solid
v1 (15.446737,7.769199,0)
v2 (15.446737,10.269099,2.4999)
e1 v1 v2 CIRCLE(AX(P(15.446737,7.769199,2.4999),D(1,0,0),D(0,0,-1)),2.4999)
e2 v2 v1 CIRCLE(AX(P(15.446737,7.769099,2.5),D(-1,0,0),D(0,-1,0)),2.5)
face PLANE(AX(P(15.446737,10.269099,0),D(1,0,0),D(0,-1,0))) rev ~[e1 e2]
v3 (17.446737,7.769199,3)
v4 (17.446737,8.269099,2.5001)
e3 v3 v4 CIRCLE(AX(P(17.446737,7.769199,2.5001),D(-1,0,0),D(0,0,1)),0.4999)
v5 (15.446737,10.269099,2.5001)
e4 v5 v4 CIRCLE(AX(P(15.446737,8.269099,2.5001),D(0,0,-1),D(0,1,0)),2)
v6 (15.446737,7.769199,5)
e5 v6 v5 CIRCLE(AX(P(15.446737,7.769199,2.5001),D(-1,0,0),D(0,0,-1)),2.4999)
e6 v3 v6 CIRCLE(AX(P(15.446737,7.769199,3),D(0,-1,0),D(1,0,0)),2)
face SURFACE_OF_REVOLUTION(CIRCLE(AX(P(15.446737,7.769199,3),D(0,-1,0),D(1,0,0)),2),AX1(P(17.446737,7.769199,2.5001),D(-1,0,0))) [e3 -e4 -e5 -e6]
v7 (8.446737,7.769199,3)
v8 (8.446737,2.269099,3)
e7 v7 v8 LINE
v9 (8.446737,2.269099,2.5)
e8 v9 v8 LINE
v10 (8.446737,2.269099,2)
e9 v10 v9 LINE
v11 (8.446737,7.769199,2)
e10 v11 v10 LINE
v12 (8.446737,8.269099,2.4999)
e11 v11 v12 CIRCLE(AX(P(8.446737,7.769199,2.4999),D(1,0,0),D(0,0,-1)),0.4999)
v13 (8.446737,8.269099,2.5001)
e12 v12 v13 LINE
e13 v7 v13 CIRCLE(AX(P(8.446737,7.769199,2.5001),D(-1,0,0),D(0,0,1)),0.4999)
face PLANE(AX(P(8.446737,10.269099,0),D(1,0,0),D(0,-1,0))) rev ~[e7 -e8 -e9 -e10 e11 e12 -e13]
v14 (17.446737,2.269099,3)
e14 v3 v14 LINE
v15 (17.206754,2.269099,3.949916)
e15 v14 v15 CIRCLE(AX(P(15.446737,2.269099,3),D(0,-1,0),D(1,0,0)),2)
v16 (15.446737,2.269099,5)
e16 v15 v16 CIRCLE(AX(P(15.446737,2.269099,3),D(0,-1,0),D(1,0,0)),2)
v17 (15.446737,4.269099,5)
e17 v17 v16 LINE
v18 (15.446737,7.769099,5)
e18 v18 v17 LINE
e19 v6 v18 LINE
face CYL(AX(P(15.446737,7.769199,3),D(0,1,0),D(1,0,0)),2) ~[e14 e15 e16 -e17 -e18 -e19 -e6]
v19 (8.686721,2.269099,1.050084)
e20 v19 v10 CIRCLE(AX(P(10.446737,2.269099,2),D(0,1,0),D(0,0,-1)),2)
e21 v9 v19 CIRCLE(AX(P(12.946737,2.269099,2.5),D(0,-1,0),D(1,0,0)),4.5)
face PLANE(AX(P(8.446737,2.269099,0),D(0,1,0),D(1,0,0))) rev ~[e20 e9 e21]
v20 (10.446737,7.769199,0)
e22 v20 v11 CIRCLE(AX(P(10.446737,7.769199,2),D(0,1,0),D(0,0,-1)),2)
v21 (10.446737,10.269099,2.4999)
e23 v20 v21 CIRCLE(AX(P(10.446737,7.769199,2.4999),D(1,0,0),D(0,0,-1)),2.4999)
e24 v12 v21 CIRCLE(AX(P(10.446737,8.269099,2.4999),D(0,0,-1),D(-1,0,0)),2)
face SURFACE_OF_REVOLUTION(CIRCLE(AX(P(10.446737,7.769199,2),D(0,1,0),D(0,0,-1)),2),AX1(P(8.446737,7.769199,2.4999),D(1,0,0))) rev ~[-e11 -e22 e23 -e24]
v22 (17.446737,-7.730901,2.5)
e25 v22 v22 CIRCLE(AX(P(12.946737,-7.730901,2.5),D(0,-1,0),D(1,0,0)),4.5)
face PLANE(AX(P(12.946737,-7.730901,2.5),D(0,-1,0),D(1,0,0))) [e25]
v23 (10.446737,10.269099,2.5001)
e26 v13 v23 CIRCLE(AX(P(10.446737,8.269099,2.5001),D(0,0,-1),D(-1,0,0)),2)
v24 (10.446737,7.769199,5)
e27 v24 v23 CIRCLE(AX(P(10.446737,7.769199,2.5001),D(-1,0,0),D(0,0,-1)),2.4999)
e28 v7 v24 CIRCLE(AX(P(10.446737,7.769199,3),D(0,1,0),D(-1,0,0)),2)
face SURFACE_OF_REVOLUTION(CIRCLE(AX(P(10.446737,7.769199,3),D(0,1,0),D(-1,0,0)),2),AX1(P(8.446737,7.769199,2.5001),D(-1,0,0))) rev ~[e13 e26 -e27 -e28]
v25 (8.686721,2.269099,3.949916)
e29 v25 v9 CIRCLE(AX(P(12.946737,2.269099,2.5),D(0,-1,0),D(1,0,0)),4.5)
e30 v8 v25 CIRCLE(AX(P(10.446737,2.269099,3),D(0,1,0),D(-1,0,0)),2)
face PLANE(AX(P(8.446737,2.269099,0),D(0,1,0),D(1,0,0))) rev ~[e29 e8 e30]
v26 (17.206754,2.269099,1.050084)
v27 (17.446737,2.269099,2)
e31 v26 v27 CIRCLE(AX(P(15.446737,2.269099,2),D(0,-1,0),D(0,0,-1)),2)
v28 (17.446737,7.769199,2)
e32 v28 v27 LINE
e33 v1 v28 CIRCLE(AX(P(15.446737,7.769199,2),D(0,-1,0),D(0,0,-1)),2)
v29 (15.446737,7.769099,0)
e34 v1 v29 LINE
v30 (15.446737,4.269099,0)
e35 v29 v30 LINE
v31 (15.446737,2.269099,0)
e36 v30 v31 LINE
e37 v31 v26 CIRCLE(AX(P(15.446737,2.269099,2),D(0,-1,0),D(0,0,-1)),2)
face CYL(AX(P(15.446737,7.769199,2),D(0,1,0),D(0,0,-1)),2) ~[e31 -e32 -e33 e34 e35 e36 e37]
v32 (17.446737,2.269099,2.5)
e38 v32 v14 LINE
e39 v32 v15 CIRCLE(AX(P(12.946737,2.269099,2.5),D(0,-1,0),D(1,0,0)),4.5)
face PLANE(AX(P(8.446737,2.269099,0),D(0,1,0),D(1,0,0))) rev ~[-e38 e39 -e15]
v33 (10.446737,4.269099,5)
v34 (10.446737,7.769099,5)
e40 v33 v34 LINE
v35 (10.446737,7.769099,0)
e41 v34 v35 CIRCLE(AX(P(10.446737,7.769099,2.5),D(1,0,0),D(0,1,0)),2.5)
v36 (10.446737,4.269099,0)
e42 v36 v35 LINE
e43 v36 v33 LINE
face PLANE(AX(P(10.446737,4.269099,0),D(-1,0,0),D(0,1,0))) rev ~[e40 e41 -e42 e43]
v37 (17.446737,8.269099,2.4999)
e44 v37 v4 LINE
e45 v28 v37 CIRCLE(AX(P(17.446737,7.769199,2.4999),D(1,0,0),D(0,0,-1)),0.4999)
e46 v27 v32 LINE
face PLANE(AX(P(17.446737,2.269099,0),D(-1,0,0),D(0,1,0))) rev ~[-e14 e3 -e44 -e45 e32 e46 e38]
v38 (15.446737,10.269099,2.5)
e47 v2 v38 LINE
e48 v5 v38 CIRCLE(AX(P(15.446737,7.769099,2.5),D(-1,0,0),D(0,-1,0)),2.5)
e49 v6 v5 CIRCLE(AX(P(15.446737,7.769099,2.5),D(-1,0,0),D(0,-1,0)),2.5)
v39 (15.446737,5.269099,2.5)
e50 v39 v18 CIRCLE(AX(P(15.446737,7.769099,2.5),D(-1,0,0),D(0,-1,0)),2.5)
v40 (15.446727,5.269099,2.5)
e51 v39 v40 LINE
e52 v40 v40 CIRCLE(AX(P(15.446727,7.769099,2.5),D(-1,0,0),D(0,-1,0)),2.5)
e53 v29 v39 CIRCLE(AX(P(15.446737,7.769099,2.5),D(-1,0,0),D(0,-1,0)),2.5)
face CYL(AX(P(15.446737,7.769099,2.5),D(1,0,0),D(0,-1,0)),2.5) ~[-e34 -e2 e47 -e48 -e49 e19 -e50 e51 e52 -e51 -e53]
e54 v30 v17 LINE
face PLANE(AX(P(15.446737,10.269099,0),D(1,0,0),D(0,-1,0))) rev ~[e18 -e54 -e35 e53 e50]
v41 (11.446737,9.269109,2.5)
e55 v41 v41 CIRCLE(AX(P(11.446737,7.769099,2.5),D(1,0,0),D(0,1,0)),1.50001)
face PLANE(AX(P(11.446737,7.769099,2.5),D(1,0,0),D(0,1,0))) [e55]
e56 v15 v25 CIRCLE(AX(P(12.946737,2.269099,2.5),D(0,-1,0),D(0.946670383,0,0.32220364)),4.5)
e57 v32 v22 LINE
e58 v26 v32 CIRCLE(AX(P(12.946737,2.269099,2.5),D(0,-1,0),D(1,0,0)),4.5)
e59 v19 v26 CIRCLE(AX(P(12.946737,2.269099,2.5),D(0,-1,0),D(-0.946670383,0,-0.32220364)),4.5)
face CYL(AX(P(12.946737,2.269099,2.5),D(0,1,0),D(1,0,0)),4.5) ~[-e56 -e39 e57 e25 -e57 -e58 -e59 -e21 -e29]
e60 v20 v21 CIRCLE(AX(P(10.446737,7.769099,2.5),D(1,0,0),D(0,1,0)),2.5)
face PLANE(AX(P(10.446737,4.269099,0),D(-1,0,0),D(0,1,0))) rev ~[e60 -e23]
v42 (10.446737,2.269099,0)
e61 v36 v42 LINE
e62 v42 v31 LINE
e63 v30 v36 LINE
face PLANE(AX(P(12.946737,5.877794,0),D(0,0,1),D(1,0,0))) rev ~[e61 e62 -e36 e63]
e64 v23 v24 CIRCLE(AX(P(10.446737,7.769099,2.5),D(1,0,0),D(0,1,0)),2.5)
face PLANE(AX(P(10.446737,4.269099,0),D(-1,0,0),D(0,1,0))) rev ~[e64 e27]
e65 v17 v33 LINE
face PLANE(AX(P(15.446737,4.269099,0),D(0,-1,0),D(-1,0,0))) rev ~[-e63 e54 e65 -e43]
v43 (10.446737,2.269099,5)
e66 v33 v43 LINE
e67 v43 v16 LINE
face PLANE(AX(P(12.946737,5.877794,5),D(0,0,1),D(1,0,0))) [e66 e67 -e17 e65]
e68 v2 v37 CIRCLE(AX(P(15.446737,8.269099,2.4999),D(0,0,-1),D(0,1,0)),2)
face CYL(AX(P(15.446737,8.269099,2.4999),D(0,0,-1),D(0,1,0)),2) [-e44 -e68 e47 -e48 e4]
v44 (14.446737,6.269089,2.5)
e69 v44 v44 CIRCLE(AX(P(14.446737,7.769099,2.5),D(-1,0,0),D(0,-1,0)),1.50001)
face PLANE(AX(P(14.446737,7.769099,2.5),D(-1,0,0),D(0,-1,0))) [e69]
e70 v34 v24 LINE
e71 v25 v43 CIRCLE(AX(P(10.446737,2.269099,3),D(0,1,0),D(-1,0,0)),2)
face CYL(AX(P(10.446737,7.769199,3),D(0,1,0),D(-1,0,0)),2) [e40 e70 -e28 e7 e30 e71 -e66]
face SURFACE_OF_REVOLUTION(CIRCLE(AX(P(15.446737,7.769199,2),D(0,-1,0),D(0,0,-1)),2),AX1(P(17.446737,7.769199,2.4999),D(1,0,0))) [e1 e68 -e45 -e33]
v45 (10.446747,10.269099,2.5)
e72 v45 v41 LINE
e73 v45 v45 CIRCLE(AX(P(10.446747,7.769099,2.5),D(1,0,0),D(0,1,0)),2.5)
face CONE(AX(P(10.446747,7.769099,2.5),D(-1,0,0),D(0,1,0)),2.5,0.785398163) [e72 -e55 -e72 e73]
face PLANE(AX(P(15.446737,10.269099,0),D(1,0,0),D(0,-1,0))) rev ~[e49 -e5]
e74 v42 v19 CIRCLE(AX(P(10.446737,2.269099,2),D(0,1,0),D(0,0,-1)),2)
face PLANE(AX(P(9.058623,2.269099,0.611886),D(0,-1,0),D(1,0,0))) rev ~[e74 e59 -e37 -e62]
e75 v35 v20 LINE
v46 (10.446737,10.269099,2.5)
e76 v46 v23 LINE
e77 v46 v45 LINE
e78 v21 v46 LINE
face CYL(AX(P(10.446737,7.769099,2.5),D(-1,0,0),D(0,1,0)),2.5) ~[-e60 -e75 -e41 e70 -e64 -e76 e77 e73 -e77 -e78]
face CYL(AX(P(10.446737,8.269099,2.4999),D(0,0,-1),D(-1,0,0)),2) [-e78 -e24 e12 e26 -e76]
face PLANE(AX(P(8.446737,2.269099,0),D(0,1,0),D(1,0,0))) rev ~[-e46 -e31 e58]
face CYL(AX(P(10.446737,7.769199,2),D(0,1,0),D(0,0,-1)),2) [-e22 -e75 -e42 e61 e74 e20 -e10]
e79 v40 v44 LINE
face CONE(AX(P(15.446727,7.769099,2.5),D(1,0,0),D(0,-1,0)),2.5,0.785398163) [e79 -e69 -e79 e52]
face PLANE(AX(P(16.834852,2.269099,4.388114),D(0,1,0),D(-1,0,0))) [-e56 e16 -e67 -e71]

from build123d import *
from build123d import SkipClean  # not in build123d's __all__

# Parameters (mm, degrees)
F1_DEPTH      = 5
F2_R          = 2.5
F3_DEPTH      = 1
F4_SIZE       = 0.99999
F5_R          = 2.5
F6_DEPTH      = 1
F7_SIZE       = 0.99999
F8_R          = 2.4999
F9_R          = 4.5
F10_DEPTH     = 10
F11_T1_DEPTH  = 5.5001
F11_T3_DEPTH  = 0.0002
F11_T6_ANGLE  = 90
F11_T8_ANGLE  = 90
F11_T10_ANGLE = 90
F11_T12_ANGLE = 90


# Not quite as in the source:
# - a fillet or chamfer that OpenCascade refuses, or shapes differently, is made with other operations: its cross-section is extruded or revolved along the edge and cut away or added
# - a fillet or chamfer is up to 0.001 mm smaller than in the source, because OpenCascade refuses the exact size


with BuildPart() as f1:
    # F0 (on Top) → F1 (new body)
    with BuildSketch(Plane.XY):
        Polygon((15.446737438, 4.2690986316), (10.446737438, 4.2690986316), (10.446737438, 10.2690986316), (8.446737438, 10.2690986316), (8.446737438, 2.2690986316), (17.446737438, 2.2690986316), (17.446737438, 10.2690986316), (15.446737438, 10.2690986316), align=None)
    extrude(amount=F1_DEPTH)

    # F2 (on face) → F3 (join)
    with BuildSketch(Plane.YZ.offset(10.446737438)):
        with Locations((7.7690986316, 2.5)):
            Circle(F2_R)
    extrude(amount=F3_DEPTH)

    # F4 (size 1 in the source; OpenCascade refuses exactly that, so slightly less here)
    f4_edges = [f1.edges().sort_by_distance(p)[0] for p in [
        (11.446737, 5.269099, 2.5),
    ]]
    chamfer(f4_edges, length=F4_SIZE)

    # F5 (on face) → F6 (join)
    with BuildSketch(Plane(origin=(15.446737438, 0, 0), x_dir=(0, -1, 0), z_dir=(-1, 0, 0))):
        with Locations((-7.7690986316, 2.5)):
            Circle(F5_R)
    extrude(amount=F6_DEPTH)

    # F7 (size 1 in the source; OpenCascade refuses exactly that, so slightly less here)
    f7_edges = [f1.edges().sort_by_distance(p)[0] for p in [
        (14.446737, 10.269099, 2.5),
    ]]
    chamfer(f7_edges, length=F7_SIZE)

    # F8 (radius 2.5 in the source; OpenCascade refuses exactly that, so slightly less here)
    f8_edges = [f1.edges().sort_by_distance(p)[0] for p in [
        (16.446737, 10.269099, 5),
        (16.446737, 10.269099, 0),
        (9.446737, 10.269099, 5),
        (9.446737, 10.269099, 0),
    ]]
    fillet(f8_edges, radius=F8_R)

    # F9 (on face) → F10 (join)
    with BuildSketch(Plane.XZ.offset(-2.2690986316)):
        with Locations((12.946737438, 2.5)):
            Circle(F9_R)
    extrude(amount=F10_DEPTH)

    # F11: fillet of radius 2 on 4 edges, made by hand

    # F11_s2 → F11_t1 (cut)
    with BuildSketch(Plane.XZ.offset(-7.7691986316)):
        with BuildLine():
            ThreePointArc((8.446737438, 3), (9.0325238756, 4.4142135624), (10.446737438, 5))
            Line((10.446737438, 5), (8.446737438, 5))
            Line((8.446737438, 5), (8.446737438, 3))
        make_face()
        with BuildLine():
            ThreePointArc((10.446737438, 0), (9.0325238756, 0.5857864376), (8.446737438, 2))
            Line((8.446737438, 2), (8.446737438, 0))
            Line((8.446737438, 0), (10.446737438, 0))
        make_face()
        with BuildLine():
            ThreePointArc((15.446737438, 0), (16.8609510003, 0.5857864376), (17.446737438, 2))
            Line((17.446737438, 2), (17.446737438, 0))
            Line((17.446737438, 0), (15.446737438, 0))
        make_face()
        with BuildLine():
            ThreePointArc((17.446737438, 3), (16.8609510003, 4.4142135624), (15.446737438, 5))
            Line((15.446737438, 5), (17.446737438, 5))
            Line((17.446737438, 5), (17.446737438, 3))
        make_face()
    extrude(amount=F11_T1_DEPTH, mode=Mode.SUBTRACT)

    # F11_s4 → F11_t3 (cut)
    with BuildSketch(Plane.XY.offset(2.4999)):
        with BuildLine():
            ThreePointArc((15.446737438, 10.2690986316), (16.8609510003, 9.6833121939), (17.446737438, 8.2690986316))
            Line((17.446737438, 8.2690986316), (17.446737438, 10.2690986316))
            Line((17.446737438, 10.2690986316), (15.446737438, 10.2690986316))
        make_face()
        with BuildLine():
            ThreePointArc((8.446737438, 8.2690986316), (9.0325238756, 9.6833121939), (10.446737438, 10.2690986316))
            Line((10.446737438, 10.2690986316), (8.446737438, 10.2690986316))
            Line((8.446737438, 10.2690986316), (8.446737438, 8.2690986316))
        make_face()
    with SkipClean():  # cleaning this boolean's faces spoils the solid; the shape is the same uncleaned
        extrude(amount=F11_T3_DEPTH, mode=Mode.SUBTRACT)

    # F11_s5 → F11_t6 (revolve, cut)
    with BuildSketch(Plane.XZ.offset(-7.7691986316)):
        with BuildLine():
            ThreePointArc((17.446737438, 3), (16.8609510003, 4.4142135624), (15.446737438, 5))
            Line((15.446737438, 5), (17.446737438, 5))
            Line((17.446737438, 5), (17.446737438, 3))
        make_face()
    with SkipClean():  # cleaning this boolean's faces spoils the solid; the shape is the same uncleaned
        revolve(axis=Axis((17.446737438, 7.7691986316, 2.5001), (-1, 0, 0)), revolution_arc=F11_T6_ANGLE, mode=Mode.SUBTRACT)

    # F11_s7 → F11_t8 (revolve, cut)
    with BuildSketch(Plane.XZ.offset(-7.7691986316)):
        with BuildLine():
            ThreePointArc((15.446737438, 0), (16.8609510003, 0.5857864376), (17.446737438, 2))
            Line((17.446737438, 2), (17.446737438, 0))
            Line((17.446737438, 0), (15.446737438, 0))
        make_face()
    with SkipClean():  # cleaning this boolean's faces spoils the solid; the shape is the same uncleaned
        revolve(axis=Axis((17.446737438, 7.7691986316, 2.4999), (1, 0, 0)), revolution_arc=F11_T8_ANGLE, mode=Mode.SUBTRACT)

    # F11_s9 → F11_t10 (revolve, cut)
    with BuildSketch(Plane.XZ.offset(-7.7691986316)):
        with BuildLine():
            ThreePointArc((10.446737438, 0), (9.0325238756, 0.5857864376), (8.446737438, 2))
            Line((8.446737438, 2), (8.446737438, 0))
            Line((8.446737438, 0), (10.446737438, 0))
        make_face()
    revolve(axis=Axis((8.446737438, 7.7691986316, 2.4999), (1, 0, 0)), revolution_arc=F11_T10_ANGLE, mode=Mode.SUBTRACT)

    # F11_s11 → F11_t12 (revolve, cut)
    with BuildSketch(Plane.XZ.offset(-7.7691986316)):
        with BuildLine():
            ThreePointArc((8.446737438, 3), (9.0325238756, 4.4142135624), (10.446737438, 5))
            Line((10.446737438, 5), (8.446737438, 5))
            Line((8.446737438, 5), (8.446737438, 3))
        make_face()
    revolve(axis=Axis((8.446737438, 7.7691986316, 2.5001), (-1, 0, 0)), revolution_arc=F11_T12_ANGLE, mode=Mode.SUBTRACT)


solid = f1.part
